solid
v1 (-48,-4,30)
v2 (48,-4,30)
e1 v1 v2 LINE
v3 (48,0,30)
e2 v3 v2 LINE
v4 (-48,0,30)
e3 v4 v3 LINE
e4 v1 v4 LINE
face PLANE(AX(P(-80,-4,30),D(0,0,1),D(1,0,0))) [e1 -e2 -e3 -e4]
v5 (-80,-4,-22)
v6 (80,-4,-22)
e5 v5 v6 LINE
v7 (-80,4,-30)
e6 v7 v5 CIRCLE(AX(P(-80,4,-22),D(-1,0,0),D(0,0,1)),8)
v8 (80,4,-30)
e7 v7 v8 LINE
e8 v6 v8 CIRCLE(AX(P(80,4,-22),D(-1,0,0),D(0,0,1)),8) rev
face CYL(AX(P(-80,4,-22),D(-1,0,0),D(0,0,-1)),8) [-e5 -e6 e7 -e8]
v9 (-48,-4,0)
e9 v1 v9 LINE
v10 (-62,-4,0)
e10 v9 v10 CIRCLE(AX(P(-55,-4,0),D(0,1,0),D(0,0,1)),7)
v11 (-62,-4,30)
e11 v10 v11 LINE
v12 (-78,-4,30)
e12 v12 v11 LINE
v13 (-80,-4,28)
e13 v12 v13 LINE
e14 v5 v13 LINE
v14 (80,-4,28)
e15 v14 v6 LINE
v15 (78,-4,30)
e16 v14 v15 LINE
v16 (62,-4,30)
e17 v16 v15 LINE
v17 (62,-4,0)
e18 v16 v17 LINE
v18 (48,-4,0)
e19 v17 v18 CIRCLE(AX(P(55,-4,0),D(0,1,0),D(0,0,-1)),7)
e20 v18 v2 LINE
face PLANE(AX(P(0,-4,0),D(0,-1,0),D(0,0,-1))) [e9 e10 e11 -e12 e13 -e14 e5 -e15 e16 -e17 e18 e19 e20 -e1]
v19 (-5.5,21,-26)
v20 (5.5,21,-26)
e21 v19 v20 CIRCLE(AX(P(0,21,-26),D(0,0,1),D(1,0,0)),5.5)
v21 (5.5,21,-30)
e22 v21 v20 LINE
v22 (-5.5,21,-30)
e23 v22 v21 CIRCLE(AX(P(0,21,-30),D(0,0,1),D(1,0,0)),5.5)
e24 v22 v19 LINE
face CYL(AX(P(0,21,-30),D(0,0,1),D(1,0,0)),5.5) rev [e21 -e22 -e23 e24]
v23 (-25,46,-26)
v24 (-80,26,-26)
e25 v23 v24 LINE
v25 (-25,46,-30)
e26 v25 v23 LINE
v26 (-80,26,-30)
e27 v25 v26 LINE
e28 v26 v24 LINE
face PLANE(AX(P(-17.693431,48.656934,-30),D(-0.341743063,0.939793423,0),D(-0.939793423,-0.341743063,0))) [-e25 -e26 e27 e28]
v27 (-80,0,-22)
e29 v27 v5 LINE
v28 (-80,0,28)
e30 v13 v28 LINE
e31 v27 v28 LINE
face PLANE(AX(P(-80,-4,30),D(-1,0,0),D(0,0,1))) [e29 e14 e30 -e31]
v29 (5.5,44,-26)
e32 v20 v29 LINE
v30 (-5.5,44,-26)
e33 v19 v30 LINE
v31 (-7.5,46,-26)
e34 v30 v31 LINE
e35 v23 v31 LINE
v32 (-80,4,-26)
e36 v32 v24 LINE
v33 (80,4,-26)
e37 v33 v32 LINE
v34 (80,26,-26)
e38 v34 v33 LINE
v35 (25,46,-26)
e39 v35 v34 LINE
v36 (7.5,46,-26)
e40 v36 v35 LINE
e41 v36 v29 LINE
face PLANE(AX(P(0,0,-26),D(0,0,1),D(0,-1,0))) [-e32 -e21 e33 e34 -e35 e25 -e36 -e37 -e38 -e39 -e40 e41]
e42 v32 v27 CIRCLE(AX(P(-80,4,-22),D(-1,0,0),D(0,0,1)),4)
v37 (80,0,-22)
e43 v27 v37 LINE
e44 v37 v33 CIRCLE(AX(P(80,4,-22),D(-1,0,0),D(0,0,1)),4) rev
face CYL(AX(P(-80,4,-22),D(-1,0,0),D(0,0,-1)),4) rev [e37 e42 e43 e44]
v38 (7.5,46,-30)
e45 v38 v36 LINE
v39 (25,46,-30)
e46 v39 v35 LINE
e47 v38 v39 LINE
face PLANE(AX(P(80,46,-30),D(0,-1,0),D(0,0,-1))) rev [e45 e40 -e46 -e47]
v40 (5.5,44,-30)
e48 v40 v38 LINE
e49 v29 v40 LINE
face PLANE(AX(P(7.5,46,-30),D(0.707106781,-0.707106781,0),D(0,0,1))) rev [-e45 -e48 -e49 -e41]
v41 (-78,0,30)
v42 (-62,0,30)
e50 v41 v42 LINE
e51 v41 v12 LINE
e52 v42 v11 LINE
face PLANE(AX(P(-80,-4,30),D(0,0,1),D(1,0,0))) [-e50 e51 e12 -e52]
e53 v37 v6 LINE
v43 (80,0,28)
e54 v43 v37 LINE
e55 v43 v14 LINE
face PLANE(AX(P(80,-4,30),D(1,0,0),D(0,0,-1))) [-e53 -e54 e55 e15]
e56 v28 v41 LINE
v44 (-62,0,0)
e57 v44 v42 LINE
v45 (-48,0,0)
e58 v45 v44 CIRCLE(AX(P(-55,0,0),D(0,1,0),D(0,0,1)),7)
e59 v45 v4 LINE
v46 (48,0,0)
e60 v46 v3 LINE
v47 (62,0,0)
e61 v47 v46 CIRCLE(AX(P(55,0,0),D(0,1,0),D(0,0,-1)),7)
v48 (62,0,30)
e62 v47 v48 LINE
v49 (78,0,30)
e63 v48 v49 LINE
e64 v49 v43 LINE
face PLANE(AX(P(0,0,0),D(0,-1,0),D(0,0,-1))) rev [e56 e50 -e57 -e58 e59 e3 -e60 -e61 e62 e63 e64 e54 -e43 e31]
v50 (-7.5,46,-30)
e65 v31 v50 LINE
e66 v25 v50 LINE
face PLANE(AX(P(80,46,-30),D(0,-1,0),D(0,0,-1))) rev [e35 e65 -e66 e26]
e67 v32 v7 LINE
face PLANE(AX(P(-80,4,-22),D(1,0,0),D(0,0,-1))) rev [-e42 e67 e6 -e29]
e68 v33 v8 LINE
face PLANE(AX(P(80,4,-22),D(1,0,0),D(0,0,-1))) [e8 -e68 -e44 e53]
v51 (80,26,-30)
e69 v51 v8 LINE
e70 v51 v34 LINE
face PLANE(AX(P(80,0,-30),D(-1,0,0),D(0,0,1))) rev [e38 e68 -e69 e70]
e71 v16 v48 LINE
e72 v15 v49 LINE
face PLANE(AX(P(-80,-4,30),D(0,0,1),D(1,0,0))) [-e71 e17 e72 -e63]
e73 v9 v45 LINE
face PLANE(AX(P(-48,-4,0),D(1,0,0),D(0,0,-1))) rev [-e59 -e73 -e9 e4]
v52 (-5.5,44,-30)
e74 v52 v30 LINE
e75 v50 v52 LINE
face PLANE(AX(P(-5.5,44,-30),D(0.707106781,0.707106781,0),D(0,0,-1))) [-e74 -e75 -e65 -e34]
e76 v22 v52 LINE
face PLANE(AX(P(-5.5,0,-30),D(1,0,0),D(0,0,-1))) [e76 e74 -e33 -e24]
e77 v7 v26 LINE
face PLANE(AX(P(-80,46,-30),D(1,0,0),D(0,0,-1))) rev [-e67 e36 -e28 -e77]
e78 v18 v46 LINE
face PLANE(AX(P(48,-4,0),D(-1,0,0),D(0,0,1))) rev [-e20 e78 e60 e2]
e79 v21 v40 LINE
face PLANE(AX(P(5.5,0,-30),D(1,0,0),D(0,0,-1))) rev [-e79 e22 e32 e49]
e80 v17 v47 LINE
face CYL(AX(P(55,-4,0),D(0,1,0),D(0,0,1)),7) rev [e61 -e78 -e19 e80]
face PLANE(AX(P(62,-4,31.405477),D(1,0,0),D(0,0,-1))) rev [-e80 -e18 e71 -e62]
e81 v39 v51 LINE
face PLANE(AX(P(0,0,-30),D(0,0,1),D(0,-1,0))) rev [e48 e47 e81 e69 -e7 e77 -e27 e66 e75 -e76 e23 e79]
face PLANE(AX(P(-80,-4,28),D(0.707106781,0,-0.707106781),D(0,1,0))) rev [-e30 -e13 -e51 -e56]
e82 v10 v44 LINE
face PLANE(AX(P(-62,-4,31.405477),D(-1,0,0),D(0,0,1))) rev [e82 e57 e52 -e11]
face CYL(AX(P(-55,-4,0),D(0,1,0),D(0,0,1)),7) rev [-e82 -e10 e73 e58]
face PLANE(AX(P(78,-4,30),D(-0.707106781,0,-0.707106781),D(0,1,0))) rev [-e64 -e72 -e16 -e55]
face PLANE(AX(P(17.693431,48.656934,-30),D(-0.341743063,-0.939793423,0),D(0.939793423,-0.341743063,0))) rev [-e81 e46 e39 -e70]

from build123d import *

# Parameters (mm, degrees)
SKETCH2_W                    = 160
SKETCH2_H                    = 60
BASE_FLANGE1_DEPTH           = 4
CUT_EXTRUDE1_DEPTH           = 86.533619121
BREAK_CORNER1_START          = -77.781745931
BREAK_CORNER1_OUTLINE_W      = 114.367532368
BREAK_CORNER1_OUTLINE_H      = 6
BREAK_CORNER1_DEPTH          = 1.414213563
BREAK_CORNER1_START_2        = 33.941125497
BREAK_CORNER1_2_OUTLINE_W    = 1.632467632
BREAK_CORNER1_2_OUTLINE_H    = 6
BREAK_CORNER1_2_DEPTH        = 2.828427125
EDGE_FLANGE1_STRIP_W         = 24
EDGE_FLANGE1_STRIP_H         = 4
EDGE_FLANGE1_STRIP_CUT_DEPTH = 160
EDGE_FLANGE1_DEPTH           = 160
CUT_EXTRUDE2_DEPTH           = 108.944430148
BREAK_CORNER2_START          = -37.830212793
BREAK_CORNER2_OUTLINE_W      = 11.776388924
BREAK_CORNER2_OUTLINE_H      = 7
BREAK_CORNER2_DEPTH          = 10.606601717


# Read off the part's stored shape, not the designer's step: Break-Corner1, Break-Corner2
# Sheet-metal steps are written as plain solids
with BuildPart() as part:
    # Sketch2 → Base-Flange1 (new body)
    with BuildSketch(Plane(origin=(0, 0, 0), x_dir=(1, 0, 0), z_dir=(0, 1, 0))):
        Rectangle(SKETCH2_W, SKETCH2_H)
    extrude(amount=-BASE_FLANGE1_DEPTH)

    # Sketch8 → Cut-Extrude1 (cut, through all)
    with BuildSketch(Plane(origin=(0, 0, 0), x_dir=(1, 0, 0), z_dir=(0, 1, 0))):
        with BuildLine():
            Line((-48, 0), (-48, -31.405477162))
            Line((-48, -31.405477162), (-62, -31.405477162))
            Line((-62, -31.405477162), (-62, 0))
            ThreePointArc((-62, 0), (-55, 7), (-48, 0))
        make_face()
        with BuildLine():
            Line((62, -31.405477162), (62, 0))
            ThreePointArc((62, 0), (55, 7), (48, 0))
            Line((48, 0), (48, -31.405477162))
            Line((48, -31.405477162), (62, -31.405477162))
        make_face()
    extrude(amount=-CUT_EXTRUDE1_DEPTH, mode=Mode.SUBTRACT)

    # Break-Corner1 outline → Break-Corner1 (cut)
    with BuildSketch(Plane(origin=(0, 0, 0), x_dir=(0.707106781186548, 0, 0.707106781186547), z_dir=(0.707106781186547, 0, -0.707106781186548)).offset(BREAK_CORNER1_START)):
        with Locations((19.183766184, 2)):
            Rectangle(BREAK_CORNER1_OUTLINE_W, BREAK_CORNER1_OUTLINE_H)
    extrude(amount=BREAK_CORNER1_DEPTH, mode=Mode.SUBTRACT)

    # Break-Corner1 2 outline → Break-Corner1 2 (cut)
    with BuildSketch(Plane(origin=(0, 0, 0), x_dir=(0.707106781186548, 0, 0.707106781186547), z_dir=(0.707106781186547, 0, -0.707106781186548)).offset(BREAK_CORNER1_START_2)):
        with Locations((77.183766184, 2)):
            Rectangle(BREAK_CORNER1_2_OUTLINE_W, BREAK_CORNER1_2_OUTLINE_H)
    extrude(amount=BREAK_CORNER1_2_DEPTH, mode=Mode.SUBTRACT)

    # Edge-Flange1 strip (across the edge) → Edge-Flange1 strip cut (cut)
    with BuildSketch(Plane(origin=(80, 0, -30), x_dir=(0, 0, 1), z_dir=(-1, 0, 0))):
        with Locations((-4, -2)):
            Rectangle(EDGE_FLANGE1_STRIP_W, EDGE_FLANGE1_STRIP_H)
    extrude(amount=EDGE_FLANGE1_STRIP_CUT_DEPTH, mode=Mode.SUBTRACT)

    # Edge-Flange1 section (across the edge) → Edge-Flange1 (add)
    with BuildSketch(Plane(origin=(80, 0, -30), x_dir=(0, 0, 1), z_dir=(-1, 0, 0))):
        with BuildLine():
            Line((0, 4), (0, 46))
            Line((0, 46), (4, 46))
            Line((4, 46), (4, 4))
            ThreePointArc((4, 4), (5.171572875, 1.171572875), (8, 0))
            Line((8, 0), (8, -4))
            ThreePointArc((8, -4), (2.343145751, -1.656854249), (0, 4))
        make_face()
    extrude(amount=EDGE_FLANGE1_DEPTH)

    # Sketch14 → Cut-Extrude2 (cut, through all)
    with BuildSketch(Plane.XY.offset(-26)):
        with BuildLine():
            Line((5.5, 21), (5.5, 51.754335402))
            Line((5.5, 51.754335402), (-5.5, 51.754335402))
            Line((-5.5, 51.754335402), (-5.5, 21))
            ThreePointArc((-5.5, 21), (0, 15.5), (5.5, 21))
        make_face()
        Polygon((80, 26), (80, 46), (25, 46), align=None)
        Polygon((-80, 26), (-25, 46), (-80, 46), align=None)
    extrude(amount=-CUT_EXTRUDE2_DEPTH, mode=Mode.SUBTRACT)

    # Break-Corner2 outline → Break-Corner2 (cut)
    with BuildSketch(Plane(origin=(0, 0, 0), x_dir=(0.707106781186546, 0.707106781186549, 0), z_dir=(0.707106781186549, -0.707106781186546, 0)).offset(BREAK_CORNER2_START)):
        with Locations((33.111805538, -28.5)):
            Rectangle(BREAK_CORNER2_OUTLINE_W, BREAK_CORNER2_OUTLINE_H)
    extrude(amount=BREAK_CORNER2_DEPTH, mode=Mode.SUBTRACT)


solid = part.part
